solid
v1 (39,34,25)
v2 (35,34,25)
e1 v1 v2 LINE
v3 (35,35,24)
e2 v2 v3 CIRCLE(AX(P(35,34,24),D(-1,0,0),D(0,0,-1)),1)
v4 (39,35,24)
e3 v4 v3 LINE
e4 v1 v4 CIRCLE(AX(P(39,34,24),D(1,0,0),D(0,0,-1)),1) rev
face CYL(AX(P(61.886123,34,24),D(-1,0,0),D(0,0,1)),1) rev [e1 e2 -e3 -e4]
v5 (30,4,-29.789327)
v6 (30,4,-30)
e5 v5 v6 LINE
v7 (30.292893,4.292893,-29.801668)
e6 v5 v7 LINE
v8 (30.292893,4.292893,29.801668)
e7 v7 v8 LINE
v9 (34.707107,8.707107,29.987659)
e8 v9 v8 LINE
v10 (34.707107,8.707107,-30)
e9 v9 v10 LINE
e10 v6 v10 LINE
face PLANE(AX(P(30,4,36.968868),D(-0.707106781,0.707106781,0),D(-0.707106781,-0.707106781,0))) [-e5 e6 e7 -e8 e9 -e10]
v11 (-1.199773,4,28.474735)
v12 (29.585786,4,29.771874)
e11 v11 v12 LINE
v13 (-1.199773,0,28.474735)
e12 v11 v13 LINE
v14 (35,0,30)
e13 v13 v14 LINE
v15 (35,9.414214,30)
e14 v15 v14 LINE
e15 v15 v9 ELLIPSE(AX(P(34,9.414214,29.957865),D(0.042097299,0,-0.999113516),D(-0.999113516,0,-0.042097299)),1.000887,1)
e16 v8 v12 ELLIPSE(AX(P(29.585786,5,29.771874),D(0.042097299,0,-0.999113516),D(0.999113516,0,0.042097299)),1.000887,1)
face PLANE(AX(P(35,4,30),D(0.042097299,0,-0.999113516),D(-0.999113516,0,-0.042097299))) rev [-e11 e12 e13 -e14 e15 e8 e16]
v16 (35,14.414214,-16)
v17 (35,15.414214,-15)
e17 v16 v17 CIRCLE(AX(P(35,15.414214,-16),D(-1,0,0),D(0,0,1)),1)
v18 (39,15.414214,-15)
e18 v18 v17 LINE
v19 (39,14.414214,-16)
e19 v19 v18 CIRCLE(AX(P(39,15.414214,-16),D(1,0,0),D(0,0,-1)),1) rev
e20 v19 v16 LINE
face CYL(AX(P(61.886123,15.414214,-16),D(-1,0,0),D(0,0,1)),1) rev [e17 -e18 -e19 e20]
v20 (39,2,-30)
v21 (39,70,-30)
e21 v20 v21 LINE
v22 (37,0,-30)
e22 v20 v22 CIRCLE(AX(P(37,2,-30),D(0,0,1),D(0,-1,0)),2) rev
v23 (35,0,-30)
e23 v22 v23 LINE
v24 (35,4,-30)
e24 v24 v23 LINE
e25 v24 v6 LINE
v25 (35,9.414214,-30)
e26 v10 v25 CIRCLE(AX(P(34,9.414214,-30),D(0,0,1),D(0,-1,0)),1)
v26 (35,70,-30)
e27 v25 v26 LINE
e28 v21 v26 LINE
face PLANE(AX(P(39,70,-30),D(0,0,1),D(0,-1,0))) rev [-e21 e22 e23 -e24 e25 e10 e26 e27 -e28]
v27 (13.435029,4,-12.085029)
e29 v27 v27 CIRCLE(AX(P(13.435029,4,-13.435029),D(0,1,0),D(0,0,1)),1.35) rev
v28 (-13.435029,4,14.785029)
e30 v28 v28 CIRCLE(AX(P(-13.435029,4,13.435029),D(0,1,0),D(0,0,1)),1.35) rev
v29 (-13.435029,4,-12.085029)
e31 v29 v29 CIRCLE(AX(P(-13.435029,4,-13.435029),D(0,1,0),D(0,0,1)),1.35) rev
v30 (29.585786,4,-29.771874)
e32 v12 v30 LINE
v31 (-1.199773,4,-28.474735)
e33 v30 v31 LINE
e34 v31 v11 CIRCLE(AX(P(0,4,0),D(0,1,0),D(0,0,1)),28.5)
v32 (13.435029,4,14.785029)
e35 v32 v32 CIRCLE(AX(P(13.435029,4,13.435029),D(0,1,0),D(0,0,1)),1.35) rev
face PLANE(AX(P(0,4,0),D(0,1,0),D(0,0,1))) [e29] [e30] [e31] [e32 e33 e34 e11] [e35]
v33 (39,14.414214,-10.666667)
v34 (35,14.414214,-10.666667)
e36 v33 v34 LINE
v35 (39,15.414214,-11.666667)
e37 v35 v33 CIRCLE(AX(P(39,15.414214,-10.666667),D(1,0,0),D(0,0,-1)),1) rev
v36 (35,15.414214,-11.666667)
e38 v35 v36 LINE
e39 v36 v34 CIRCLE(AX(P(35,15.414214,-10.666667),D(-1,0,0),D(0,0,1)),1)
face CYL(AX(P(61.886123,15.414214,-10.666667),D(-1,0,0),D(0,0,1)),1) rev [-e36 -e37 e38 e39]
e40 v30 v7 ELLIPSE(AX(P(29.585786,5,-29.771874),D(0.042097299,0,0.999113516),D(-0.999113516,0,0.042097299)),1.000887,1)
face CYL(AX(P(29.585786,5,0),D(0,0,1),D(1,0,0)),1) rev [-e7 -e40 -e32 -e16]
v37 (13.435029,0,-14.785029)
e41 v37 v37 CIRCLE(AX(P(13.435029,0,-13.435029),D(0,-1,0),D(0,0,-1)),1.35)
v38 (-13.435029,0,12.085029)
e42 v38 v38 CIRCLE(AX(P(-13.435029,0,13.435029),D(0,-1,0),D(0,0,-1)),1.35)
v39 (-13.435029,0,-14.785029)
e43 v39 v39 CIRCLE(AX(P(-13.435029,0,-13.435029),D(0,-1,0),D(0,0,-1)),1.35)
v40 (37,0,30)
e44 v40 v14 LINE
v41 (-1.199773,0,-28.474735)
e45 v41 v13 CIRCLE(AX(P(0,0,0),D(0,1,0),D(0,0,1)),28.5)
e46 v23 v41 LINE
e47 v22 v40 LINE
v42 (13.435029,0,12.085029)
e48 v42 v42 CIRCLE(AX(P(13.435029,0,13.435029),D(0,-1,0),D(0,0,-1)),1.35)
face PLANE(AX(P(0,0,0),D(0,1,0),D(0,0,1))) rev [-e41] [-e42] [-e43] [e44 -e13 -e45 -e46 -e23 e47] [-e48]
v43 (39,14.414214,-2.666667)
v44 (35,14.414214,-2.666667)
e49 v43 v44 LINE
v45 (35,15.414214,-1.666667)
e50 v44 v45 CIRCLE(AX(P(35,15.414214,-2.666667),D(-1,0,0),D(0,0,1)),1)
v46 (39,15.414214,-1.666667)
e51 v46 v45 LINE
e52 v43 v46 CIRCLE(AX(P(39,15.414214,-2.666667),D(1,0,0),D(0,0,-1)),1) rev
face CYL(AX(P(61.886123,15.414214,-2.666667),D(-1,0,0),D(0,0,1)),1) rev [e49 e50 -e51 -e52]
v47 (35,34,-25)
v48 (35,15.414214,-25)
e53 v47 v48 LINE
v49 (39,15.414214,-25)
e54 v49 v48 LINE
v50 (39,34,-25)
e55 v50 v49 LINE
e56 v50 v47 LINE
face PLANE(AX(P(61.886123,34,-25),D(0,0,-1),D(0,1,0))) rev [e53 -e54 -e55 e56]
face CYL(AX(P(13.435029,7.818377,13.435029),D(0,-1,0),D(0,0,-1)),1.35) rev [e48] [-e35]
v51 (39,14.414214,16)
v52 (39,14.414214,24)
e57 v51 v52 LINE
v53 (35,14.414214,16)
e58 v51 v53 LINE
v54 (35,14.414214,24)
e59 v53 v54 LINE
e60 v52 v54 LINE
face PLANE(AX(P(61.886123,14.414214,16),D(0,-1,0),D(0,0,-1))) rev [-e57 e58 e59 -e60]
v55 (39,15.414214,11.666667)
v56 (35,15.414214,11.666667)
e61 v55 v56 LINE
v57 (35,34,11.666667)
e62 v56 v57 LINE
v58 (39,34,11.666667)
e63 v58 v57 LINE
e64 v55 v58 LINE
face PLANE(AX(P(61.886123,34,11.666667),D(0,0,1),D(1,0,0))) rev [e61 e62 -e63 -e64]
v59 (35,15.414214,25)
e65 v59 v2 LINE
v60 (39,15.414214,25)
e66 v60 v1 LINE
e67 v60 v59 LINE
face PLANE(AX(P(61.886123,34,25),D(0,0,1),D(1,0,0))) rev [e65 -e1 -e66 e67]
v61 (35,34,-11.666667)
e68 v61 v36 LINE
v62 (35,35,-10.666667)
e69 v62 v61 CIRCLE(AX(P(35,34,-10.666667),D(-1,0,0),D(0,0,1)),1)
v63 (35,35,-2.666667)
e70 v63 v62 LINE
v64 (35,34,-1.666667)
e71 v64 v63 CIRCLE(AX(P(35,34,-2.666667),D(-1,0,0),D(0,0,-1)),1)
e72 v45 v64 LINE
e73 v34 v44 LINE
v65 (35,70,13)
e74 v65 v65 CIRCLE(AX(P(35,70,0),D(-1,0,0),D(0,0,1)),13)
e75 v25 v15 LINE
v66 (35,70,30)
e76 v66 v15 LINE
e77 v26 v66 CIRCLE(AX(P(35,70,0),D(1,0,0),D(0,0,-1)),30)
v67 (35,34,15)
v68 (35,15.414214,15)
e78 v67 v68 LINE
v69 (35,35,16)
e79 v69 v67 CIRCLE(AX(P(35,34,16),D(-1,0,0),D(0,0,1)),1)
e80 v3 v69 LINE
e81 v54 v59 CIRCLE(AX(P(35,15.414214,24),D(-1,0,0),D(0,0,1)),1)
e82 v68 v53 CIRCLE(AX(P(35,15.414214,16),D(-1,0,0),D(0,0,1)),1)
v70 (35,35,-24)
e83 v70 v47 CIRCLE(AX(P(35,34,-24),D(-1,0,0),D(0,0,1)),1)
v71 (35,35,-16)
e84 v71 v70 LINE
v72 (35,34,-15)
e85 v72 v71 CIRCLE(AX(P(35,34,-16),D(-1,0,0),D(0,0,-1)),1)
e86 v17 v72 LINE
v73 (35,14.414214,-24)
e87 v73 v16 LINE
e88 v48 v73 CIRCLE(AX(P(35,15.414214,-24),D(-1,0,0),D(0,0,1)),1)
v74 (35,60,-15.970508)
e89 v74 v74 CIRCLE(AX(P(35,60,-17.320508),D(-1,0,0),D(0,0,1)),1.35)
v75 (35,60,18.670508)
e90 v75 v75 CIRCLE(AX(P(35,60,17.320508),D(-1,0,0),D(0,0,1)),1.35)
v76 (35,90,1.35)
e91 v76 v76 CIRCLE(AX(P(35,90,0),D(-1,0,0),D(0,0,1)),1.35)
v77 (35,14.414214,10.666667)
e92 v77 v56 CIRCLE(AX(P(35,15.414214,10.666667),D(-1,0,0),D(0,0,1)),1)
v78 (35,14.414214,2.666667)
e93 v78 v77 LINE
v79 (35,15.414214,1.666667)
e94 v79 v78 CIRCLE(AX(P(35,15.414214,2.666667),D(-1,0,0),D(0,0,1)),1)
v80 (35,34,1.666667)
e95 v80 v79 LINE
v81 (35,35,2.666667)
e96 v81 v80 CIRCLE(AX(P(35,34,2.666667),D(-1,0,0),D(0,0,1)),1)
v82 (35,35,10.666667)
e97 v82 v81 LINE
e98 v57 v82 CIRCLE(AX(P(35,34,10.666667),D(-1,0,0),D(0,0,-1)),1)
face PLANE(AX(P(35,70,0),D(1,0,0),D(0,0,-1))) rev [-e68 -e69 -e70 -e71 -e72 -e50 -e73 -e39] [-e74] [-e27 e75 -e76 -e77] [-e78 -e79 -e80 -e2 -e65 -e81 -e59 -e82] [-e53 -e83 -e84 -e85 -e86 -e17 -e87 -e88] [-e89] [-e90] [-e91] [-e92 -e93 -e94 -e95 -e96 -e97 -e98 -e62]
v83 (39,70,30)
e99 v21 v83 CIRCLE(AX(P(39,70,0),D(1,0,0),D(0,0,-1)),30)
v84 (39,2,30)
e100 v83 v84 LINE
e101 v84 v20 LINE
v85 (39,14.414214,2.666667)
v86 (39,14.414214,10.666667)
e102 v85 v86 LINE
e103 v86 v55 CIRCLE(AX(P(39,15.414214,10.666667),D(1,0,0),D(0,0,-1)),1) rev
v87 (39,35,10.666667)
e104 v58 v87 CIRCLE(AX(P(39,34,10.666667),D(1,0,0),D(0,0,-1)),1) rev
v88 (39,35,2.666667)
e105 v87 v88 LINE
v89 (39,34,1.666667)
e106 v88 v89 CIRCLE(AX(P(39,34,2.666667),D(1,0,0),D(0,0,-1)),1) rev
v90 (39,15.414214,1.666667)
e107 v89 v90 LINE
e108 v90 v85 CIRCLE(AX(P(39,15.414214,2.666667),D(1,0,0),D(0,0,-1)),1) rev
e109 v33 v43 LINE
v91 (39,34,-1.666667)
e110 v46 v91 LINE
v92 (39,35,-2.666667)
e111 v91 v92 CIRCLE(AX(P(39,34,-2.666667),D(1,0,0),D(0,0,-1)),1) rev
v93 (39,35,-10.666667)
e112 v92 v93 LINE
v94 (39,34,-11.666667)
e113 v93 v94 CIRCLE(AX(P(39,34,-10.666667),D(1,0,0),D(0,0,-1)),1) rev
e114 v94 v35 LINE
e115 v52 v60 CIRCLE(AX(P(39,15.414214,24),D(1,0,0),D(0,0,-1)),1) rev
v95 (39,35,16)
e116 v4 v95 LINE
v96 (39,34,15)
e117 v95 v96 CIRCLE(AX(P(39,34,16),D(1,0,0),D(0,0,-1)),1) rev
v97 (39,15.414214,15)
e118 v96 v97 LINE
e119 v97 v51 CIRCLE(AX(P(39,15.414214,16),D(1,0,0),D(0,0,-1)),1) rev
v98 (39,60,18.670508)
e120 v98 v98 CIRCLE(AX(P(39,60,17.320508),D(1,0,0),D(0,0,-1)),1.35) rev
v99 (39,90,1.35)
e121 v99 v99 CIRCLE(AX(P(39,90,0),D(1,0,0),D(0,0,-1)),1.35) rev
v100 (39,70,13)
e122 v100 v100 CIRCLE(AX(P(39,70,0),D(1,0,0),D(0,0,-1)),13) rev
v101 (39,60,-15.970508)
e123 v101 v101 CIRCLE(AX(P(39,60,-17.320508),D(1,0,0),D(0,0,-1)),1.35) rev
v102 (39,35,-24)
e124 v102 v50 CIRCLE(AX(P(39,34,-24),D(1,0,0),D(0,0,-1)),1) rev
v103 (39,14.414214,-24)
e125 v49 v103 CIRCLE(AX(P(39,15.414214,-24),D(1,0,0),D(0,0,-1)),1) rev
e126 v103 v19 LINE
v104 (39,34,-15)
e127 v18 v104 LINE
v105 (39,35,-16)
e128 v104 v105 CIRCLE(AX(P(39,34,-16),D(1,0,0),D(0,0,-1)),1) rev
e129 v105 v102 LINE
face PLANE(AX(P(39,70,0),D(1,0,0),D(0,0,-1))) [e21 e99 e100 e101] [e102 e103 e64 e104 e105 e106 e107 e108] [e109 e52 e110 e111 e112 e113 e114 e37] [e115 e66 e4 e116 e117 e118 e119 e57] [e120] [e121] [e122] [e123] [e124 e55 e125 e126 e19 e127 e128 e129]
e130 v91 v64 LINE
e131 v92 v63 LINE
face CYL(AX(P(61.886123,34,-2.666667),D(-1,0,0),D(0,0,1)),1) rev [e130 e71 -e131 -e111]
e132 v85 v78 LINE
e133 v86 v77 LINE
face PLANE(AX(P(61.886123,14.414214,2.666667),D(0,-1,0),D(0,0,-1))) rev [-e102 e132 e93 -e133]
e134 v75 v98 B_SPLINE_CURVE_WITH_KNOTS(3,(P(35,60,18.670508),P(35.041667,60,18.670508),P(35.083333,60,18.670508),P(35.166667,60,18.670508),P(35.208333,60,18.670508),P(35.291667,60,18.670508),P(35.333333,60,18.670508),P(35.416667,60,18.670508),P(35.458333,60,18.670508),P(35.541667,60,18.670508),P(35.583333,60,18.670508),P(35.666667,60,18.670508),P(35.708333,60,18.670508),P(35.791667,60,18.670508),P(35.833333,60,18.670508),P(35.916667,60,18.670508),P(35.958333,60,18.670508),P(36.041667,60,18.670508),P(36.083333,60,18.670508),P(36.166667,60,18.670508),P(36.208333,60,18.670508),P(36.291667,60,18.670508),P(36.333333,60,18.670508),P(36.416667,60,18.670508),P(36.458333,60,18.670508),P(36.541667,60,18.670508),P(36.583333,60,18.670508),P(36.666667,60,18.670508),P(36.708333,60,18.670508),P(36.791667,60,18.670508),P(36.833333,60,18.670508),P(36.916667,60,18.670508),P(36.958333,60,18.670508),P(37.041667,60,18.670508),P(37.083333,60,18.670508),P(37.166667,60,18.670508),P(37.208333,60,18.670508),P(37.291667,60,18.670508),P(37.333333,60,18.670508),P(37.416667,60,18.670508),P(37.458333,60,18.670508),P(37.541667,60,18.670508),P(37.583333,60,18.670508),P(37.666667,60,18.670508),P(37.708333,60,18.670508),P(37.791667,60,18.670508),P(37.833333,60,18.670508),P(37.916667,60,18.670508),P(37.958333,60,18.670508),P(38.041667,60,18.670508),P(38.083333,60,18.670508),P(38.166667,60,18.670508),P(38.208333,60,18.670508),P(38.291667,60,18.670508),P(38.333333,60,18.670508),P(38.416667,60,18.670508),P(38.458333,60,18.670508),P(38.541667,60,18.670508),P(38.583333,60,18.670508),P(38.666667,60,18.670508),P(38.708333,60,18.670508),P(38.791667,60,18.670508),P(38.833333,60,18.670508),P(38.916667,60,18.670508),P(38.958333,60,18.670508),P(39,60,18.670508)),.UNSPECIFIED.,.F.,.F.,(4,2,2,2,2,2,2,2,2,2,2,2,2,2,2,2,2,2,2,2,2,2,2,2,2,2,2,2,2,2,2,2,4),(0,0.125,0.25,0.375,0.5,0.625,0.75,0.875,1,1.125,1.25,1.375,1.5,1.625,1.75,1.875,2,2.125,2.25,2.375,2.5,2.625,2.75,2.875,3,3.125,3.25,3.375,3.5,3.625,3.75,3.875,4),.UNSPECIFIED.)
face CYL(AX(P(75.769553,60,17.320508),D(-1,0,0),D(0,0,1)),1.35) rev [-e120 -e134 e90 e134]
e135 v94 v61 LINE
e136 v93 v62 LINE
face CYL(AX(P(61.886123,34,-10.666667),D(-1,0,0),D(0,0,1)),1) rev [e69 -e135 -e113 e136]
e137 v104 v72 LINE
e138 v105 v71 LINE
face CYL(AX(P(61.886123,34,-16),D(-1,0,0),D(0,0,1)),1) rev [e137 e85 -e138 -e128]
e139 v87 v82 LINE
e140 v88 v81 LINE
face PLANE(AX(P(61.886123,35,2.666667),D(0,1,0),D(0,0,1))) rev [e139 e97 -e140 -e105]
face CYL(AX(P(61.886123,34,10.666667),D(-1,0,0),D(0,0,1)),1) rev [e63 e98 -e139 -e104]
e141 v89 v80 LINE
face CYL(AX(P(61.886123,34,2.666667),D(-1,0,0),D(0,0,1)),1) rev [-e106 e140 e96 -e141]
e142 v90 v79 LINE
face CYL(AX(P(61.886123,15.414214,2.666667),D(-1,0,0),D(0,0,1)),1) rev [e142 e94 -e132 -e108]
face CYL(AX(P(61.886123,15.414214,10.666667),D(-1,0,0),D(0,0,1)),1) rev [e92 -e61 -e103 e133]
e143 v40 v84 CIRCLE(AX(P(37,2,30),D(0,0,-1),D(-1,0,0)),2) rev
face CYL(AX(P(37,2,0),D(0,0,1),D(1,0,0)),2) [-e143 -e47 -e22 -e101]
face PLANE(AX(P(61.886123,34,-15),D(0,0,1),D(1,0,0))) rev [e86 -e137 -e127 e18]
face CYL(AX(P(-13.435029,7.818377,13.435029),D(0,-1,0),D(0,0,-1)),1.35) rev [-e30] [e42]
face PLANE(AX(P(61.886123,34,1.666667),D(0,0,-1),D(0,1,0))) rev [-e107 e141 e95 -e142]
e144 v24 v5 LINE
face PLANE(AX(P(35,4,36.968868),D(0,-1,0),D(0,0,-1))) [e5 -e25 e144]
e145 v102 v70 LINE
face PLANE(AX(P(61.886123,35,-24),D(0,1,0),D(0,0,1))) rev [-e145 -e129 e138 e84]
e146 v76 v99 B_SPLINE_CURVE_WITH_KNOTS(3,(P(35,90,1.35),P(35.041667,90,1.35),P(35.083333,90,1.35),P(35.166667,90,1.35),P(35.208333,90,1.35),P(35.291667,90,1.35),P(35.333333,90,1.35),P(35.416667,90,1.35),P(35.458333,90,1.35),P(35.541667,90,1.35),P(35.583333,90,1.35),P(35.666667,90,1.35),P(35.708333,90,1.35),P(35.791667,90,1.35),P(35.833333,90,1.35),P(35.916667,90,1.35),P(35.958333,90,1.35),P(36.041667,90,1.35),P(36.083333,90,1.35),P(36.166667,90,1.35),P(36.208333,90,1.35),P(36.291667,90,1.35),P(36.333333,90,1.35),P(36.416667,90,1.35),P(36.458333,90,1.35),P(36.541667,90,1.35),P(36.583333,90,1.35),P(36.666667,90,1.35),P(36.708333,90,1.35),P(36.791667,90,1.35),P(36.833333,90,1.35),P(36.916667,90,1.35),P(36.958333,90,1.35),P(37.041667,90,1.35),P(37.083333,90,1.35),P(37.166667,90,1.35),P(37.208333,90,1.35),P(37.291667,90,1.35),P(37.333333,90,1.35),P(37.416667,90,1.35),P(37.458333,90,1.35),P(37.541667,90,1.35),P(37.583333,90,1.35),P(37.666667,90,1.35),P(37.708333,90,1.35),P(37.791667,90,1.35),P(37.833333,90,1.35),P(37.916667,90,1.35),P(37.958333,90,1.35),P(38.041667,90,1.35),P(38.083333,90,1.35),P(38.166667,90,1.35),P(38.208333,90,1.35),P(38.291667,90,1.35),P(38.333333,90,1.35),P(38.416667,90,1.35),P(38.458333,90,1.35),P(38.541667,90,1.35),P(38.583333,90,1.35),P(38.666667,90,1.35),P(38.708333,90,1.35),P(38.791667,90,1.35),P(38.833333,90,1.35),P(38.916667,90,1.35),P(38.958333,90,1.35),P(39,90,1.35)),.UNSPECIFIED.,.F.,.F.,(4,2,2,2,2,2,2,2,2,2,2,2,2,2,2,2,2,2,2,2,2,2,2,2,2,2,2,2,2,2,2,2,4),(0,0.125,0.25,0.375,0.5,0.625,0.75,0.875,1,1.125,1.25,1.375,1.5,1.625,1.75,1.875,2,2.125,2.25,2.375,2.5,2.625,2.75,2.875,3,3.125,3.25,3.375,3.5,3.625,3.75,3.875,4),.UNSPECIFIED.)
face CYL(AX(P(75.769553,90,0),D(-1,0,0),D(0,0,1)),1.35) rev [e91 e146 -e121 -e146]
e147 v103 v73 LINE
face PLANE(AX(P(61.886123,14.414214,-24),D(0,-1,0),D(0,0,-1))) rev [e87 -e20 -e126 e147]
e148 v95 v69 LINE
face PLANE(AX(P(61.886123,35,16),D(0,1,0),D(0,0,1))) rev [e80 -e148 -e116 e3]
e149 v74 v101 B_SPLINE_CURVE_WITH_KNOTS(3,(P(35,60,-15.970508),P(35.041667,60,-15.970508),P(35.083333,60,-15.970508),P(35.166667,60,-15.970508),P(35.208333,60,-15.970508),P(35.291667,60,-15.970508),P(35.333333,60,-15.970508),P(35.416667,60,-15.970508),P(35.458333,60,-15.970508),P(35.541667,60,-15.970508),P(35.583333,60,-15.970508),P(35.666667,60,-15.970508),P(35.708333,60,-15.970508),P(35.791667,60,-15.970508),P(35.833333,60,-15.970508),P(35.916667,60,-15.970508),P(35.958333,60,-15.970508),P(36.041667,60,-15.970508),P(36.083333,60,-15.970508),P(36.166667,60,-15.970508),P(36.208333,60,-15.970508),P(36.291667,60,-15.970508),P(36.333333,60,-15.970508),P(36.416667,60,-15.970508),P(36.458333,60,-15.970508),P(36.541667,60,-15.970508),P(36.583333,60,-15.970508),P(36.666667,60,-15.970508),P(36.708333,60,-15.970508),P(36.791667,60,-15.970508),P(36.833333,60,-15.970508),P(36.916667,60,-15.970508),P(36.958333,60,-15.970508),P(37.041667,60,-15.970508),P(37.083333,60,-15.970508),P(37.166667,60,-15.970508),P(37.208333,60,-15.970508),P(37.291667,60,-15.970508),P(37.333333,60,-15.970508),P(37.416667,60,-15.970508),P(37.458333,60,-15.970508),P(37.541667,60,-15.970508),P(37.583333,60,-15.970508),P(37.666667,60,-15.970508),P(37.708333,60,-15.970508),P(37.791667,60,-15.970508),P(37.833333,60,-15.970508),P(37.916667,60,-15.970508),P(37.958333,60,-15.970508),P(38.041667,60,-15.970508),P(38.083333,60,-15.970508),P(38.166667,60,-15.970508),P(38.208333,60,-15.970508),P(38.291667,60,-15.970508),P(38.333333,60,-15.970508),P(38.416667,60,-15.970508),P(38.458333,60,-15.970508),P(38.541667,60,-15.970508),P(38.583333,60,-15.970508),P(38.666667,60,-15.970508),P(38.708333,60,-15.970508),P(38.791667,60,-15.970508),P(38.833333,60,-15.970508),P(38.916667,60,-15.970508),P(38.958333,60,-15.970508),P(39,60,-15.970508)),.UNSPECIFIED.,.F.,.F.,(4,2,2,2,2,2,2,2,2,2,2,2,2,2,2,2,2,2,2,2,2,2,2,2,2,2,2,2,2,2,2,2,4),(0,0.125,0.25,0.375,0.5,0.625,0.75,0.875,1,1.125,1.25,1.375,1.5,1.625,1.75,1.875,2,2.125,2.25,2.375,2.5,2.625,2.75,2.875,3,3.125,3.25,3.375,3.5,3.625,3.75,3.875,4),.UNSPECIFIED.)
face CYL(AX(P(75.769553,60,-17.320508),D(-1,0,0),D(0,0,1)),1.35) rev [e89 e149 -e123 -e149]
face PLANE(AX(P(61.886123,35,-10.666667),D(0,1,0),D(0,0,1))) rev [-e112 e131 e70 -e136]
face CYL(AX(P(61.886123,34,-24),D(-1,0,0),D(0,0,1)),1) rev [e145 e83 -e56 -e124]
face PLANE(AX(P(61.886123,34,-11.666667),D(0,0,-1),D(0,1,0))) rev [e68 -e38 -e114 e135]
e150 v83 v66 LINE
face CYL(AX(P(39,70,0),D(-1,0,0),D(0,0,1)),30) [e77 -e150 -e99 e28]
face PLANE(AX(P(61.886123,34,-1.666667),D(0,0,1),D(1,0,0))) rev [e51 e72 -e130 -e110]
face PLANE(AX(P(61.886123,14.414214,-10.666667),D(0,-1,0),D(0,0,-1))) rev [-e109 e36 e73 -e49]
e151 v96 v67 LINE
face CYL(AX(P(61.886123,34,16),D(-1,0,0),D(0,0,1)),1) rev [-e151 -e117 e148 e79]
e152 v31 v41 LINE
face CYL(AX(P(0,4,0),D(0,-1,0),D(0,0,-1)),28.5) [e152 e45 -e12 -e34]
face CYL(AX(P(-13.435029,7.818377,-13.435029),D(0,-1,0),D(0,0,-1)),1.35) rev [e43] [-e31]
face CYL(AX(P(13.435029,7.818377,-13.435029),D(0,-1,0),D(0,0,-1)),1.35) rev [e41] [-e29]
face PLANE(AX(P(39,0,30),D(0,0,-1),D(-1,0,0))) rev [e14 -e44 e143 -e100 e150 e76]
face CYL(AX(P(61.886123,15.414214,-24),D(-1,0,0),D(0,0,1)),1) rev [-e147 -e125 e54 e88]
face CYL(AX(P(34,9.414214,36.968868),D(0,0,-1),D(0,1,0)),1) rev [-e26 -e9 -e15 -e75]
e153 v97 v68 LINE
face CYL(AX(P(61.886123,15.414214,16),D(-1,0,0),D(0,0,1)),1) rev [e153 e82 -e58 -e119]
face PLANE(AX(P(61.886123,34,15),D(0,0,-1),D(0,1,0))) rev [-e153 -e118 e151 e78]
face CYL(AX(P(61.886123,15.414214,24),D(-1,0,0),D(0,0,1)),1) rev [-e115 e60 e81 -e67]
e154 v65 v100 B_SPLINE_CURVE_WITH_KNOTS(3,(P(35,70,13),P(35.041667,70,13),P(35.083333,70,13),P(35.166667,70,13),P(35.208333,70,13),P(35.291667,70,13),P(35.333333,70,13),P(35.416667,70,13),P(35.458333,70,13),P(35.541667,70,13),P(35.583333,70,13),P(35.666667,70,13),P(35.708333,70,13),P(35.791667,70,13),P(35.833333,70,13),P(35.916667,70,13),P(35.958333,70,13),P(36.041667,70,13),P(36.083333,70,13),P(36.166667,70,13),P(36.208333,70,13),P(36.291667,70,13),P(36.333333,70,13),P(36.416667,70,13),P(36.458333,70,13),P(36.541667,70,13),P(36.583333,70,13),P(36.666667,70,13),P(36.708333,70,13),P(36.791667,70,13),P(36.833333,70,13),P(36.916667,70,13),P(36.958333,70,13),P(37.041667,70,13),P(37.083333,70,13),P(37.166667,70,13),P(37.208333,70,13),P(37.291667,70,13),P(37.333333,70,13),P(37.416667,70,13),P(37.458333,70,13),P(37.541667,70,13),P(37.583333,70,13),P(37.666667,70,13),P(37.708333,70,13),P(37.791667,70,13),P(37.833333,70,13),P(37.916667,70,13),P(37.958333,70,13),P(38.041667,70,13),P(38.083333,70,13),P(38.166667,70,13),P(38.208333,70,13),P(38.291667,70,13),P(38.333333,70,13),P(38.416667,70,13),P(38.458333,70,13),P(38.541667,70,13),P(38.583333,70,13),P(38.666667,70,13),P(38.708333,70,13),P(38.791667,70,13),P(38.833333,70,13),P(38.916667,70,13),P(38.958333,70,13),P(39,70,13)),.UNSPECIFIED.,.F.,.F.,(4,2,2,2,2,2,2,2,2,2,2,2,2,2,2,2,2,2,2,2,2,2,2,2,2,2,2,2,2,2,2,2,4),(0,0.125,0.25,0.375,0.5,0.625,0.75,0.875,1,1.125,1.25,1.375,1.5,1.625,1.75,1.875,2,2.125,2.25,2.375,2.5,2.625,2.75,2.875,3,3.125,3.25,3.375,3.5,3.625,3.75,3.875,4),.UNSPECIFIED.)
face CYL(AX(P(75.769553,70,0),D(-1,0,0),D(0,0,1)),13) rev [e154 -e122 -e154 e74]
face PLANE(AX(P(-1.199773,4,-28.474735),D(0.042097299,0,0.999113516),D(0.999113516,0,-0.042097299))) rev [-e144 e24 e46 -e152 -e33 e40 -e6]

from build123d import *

# Parameters (mm, degrees)
EXTRUDE_1_DEPTH     = 4
EXTRUDE_2_DEPTH     = 4
SKETCH_4_R          = 1.35
SKETCH_4_R_2        = 13
CUT_EXTRUDE_1_DEPTH = 4
SKETCH_5_R          = 1.35
CUT_EXTRUDE_2_DEPTH = 4
EXTRUDE_3_REACH     = 124.967
FILLET_1_R          = 1
CUT_EXTRUDE_3_DEPTH = 4
FILLET_2_R          = 2


with BuildPart() as part:
    # 草图1 → 凸台-拉伸1 (new body)
    with BuildSketch(Plane(origin=(0, 0, 0), x_dir=(1, 0, 0), z_dir=(0, 1, 0))):
        with BuildLine():
            Line((-1.199773028, 28.474735199), (35, 30))
            Line((35, 30), (35, -30))
            Line((35, -30), (-1.199773028, -28.474735199))
            ThreePointArc((-1.199773028, -28.474735199), (-28.5, 0), (-1.199773028, 28.474735199))
        make_face()
    extrude(amount=EXTRUDE_1_DEPTH)

    # 草图3 → 凸台-拉伸2 (add)
    with BuildSketch(Plane(origin=(35, 0, 0), x_dir=(0, 0, -1), z_dir=(1, 0, 0))):
        with BuildLine():
            Line((-30, 0), (-30, 70))
            ThreePointArc((-30, 70), (0, 100), (30, 70))
            Line((30, 70), (30, 0))
            Line((30, 0), (-30, 0))
        make_face()
    extrude(amount=EXTRUDE_2_DEPTH)

    # 草图4 → 切除-拉伸1 (cut)
    with BuildSketch(Plane.ZY.offset(-35)):
        with Locations((0, 90)):
            Circle(SKETCH_4_R)
        with Locations((17.320508076, 60)):
            Circle(SKETCH_4_R)
        with Locations((-17.320508076, 60)):
            Circle(SKETCH_4_R)
        with Locations((0, 70)):
            Circle(SKETCH_4_R_2)
    extrude(amount=-CUT_EXTRUDE_1_DEPTH, mode=Mode.SUBTRACT)

    # 草图5 → 切除-拉伸2 (cut)
    with BuildSketch(Plane.XZ):
        with Locations(Location((-13.435028843, 13.435028843, 0), (0, 0, 270))):
            Circle(SKETCH_5_R)
        with Locations(Location((13.435028843, 13.435028843, 0), (0, 0, 270))):
            Circle(SKETCH_5_R)
        with Locations(Location((13.435028843, -13.435028843, 0), (0, 0, 270))):
            Circle(SKETCH_5_R)
        with Locations(Location((-13.435028843, -13.435028843, 0), (0, 0, 270))):
            Circle(SKETCH_5_R)
    extrude(amount=-CUT_EXTRUDE_2_DEPTH, mode=Mode.SUBTRACT)

    # 凸台-拉伸3: up to this plane
    extrude_3_end = Plane(origin=(35, 4, 30), z_dir=(0.04209729923272397, 0, -0.9991135157715116))
    # 草图6 → 凸台-拉伸3 (add, up to the surface)
    with BuildSketch(Plane(origin=(0, 0, -30), x_dir=(-1, 0, 0), z_dir=(0, 0, -1)), mode=Mode.PRIVATE) as extrude_3_sk1:
        Polygon((-35, 9), (-35, 4), (-30, 4), align=None)
    extrude_3_tool1 = split(extrude(extrude_3_sk1.sketch, amount=-EXTRUDE_3_REACH, mode=Mode.PRIVATE), bisect_by=extrude_3_end, keep=Keep.BOTH, mode=Mode.PRIVATE)
    add(extrude_3_tool1.solids().sort_by_distance((33.333333, 5.666667, -30))[0])

    # 圆角1
    # the kernel refuses this fillet: 1 mm, written as the material it adds along each edge
    with BuildSketch(Plane(origin=(35, 9, -30), x_dir=(-0.7071067811865455, -0.7071067811865497, 0), z_dir=(0, 0, 1))) as fillet_1_piece_1_section:
        with BuildLine():
            CenterArc((FILLET_1_R * 0.414213562373, -FILLET_1_R), FILLET_1_R, 90, 45)
            Line((-FILLET_1_R * 0.292893218813, -FILLET_1_R * 0.292893218813), (0, 0))
            Line((0, 0), (FILLET_1_R * 0.414213562373, 0))
        make_face()
    fillet_1_piece_1 = extrude(amount=61.035533906, mode=Mode.PRIVATE)
    fillet_1_piece_1 = split(fillet_1_piece_1, bisect_by=Plane(origin=(33.678090618, 9.024924819, 29.94430181), z_dir=(0.042097299232723984, 0, -0.9991135157715116)), keep=Keep.TOP, mode=Mode.PRIVATE)
    add(fillet_1_piece_1)
    with BuildSketch(Plane(origin=(30, 4, -30.824860651), x_dir=(0.7071067811865442, 0.7071067811865507, 0), z_dir=(0, 0, 1))) as fillet_1_piece_2_section:
        with BuildLine():
            CenterArc((FILLET_1_R * 0.414213562373, FILLET_1_R), FILLET_1_R, 225, 45)
            Line((-FILLET_1_R * 0.292893218813, FILLET_1_R * 0.292893218813), (0, 0))
            Line((0, 0), (FILLET_1_R * 0.414213562373, 0))
        make_face()
    fillet_1_piece_2 = extrude(amount=61.649721303, mode=Mode.PRIVATE)
    fillet_1_piece_2 = split(fillet_1_piece_2, bisect_by=Plane(origin=(28.722202674, 4.060172408, -29.735487201), z_dir=(0.042097299232723984, 0, 0.9991135157715116)), keep=Keep.TOP, mode=Mode.PRIVATE)
    fillet_1_piece_2 = split(fillet_1_piece_2, bisect_by=Plane(origin=(28.722202674, 4.060172408, 29.735487201), z_dir=(0.042097299232723984, 0, -0.9991135157715116)), keep=Keep.TOP, mode=Mode.PRIVATE)
    add(fillet_1_piece_2)

    # 草图7 → 切除-拉伸3 (cut)
    with BuildSketch(Plane.ZY.offset(-35)):
        with BuildLine():
            Line((-24, 35), (-16, 35))
            ThreePointArc((-16, 35), (-15.292893219, 34.707106781), (-15, 34))
            Line((-15, 34), (-15, 15.414213562))
            ThreePointArc((-15, 15.414213562), (-15.292893219, 14.707106781), (-16, 14.414213562))
            Line((-16, 14.414213562), (-24, 14.414213562))
            ThreePointArc((-24, 14.414213562), (-24.707106781, 14.707106781), (-25, 15.414213562))
            Line((-25, 15.414213562), (-25, 34))
            ThreePointArc((-25, 34), (-24.707106781, 34.707106781), (-24, 35))
        make_face()
        with BuildLine():
            Line((-11.666666667, 34), (-11.666666667, 15.414213562))
            ThreePointArc((-11.666666667, 15.414213562), (-11.373773448, 14.707106781), (-10.666666667, 14.414213562))
            Line((-10.666666667, 14.414213562), (-2.666666667, 14.414213562))
            ThreePointArc((-2.666666667, 14.414213562), (-1.959559885, 14.707106781), (-1.666666667, 15.414213562))
            Line((-1.666666667, 15.414213562), (-1.666666667, 34))
            ThreePointArc((-1.666666667, 34), (-1.959559885, 34.707106781), (-2.666666667, 35))
            Line((-2.666666667, 35), (-10.666666667, 35))
            ThreePointArc((-10.666666667, 35), (-11.373773448, 34.707106781), (-11.666666667, 34))
        make_face()
        with BuildLine():
            Line((1.666666667, 34), (1.666666667, 15.414213562))
            ThreePointArc((1.666666667, 15.414213562), (1.959559885, 14.707106781), (2.666666667, 14.414213562))
            Line((2.666666667, 14.414213562), (10.666666667, 14.414213562))
            ThreePointArc((10.666666667, 14.414213562), (11.373773448, 14.707106781), (11.666666667, 15.414213562))
            Line((11.666666667, 15.414213562), (11.666666667, 34))
            ThreePointArc((11.666666667, 34), (11.373773448, 34.707106781), (10.666666667, 35))
            Line((10.666666667, 35), (2.666666667, 35))
            ThreePointArc((2.666666667, 35), (1.959559885, 34.707106781), (1.666666667, 34))
        make_face()
        with BuildLine():
            Line((15, 34), (15, 15.414213562))
            ThreePointArc((15, 15.414213562), (15.292893219, 14.707106781), (16, 14.414213562))
            Line((16, 14.414213562), (24, 14.414213562))
            ThreePointArc((24, 14.414213562), (24.707106781, 14.707106781), (25, 15.414213562))
            Line((25, 15.414213562), (25, 34))
            ThreePointArc((25, 34), (24.707106781, 34.707106781), (24, 35))
            Line((24, 35), (16, 35))
            ThreePointArc((16, 35), (15.292893219, 34.707106781), (15, 34))
        make_face()
    extrude(amount=-CUT_EXTRUDE_3_DEPTH, mode=Mode.SUBTRACT)

    # 圆角2
    fillet_2_edges = [part.edges().sort_by_distance(p)[0] for p in [
        (39, 0, 0),
    ]]
    fillet(fillet_2_edges, radius=FILLET_2_R)


solid = part.part
